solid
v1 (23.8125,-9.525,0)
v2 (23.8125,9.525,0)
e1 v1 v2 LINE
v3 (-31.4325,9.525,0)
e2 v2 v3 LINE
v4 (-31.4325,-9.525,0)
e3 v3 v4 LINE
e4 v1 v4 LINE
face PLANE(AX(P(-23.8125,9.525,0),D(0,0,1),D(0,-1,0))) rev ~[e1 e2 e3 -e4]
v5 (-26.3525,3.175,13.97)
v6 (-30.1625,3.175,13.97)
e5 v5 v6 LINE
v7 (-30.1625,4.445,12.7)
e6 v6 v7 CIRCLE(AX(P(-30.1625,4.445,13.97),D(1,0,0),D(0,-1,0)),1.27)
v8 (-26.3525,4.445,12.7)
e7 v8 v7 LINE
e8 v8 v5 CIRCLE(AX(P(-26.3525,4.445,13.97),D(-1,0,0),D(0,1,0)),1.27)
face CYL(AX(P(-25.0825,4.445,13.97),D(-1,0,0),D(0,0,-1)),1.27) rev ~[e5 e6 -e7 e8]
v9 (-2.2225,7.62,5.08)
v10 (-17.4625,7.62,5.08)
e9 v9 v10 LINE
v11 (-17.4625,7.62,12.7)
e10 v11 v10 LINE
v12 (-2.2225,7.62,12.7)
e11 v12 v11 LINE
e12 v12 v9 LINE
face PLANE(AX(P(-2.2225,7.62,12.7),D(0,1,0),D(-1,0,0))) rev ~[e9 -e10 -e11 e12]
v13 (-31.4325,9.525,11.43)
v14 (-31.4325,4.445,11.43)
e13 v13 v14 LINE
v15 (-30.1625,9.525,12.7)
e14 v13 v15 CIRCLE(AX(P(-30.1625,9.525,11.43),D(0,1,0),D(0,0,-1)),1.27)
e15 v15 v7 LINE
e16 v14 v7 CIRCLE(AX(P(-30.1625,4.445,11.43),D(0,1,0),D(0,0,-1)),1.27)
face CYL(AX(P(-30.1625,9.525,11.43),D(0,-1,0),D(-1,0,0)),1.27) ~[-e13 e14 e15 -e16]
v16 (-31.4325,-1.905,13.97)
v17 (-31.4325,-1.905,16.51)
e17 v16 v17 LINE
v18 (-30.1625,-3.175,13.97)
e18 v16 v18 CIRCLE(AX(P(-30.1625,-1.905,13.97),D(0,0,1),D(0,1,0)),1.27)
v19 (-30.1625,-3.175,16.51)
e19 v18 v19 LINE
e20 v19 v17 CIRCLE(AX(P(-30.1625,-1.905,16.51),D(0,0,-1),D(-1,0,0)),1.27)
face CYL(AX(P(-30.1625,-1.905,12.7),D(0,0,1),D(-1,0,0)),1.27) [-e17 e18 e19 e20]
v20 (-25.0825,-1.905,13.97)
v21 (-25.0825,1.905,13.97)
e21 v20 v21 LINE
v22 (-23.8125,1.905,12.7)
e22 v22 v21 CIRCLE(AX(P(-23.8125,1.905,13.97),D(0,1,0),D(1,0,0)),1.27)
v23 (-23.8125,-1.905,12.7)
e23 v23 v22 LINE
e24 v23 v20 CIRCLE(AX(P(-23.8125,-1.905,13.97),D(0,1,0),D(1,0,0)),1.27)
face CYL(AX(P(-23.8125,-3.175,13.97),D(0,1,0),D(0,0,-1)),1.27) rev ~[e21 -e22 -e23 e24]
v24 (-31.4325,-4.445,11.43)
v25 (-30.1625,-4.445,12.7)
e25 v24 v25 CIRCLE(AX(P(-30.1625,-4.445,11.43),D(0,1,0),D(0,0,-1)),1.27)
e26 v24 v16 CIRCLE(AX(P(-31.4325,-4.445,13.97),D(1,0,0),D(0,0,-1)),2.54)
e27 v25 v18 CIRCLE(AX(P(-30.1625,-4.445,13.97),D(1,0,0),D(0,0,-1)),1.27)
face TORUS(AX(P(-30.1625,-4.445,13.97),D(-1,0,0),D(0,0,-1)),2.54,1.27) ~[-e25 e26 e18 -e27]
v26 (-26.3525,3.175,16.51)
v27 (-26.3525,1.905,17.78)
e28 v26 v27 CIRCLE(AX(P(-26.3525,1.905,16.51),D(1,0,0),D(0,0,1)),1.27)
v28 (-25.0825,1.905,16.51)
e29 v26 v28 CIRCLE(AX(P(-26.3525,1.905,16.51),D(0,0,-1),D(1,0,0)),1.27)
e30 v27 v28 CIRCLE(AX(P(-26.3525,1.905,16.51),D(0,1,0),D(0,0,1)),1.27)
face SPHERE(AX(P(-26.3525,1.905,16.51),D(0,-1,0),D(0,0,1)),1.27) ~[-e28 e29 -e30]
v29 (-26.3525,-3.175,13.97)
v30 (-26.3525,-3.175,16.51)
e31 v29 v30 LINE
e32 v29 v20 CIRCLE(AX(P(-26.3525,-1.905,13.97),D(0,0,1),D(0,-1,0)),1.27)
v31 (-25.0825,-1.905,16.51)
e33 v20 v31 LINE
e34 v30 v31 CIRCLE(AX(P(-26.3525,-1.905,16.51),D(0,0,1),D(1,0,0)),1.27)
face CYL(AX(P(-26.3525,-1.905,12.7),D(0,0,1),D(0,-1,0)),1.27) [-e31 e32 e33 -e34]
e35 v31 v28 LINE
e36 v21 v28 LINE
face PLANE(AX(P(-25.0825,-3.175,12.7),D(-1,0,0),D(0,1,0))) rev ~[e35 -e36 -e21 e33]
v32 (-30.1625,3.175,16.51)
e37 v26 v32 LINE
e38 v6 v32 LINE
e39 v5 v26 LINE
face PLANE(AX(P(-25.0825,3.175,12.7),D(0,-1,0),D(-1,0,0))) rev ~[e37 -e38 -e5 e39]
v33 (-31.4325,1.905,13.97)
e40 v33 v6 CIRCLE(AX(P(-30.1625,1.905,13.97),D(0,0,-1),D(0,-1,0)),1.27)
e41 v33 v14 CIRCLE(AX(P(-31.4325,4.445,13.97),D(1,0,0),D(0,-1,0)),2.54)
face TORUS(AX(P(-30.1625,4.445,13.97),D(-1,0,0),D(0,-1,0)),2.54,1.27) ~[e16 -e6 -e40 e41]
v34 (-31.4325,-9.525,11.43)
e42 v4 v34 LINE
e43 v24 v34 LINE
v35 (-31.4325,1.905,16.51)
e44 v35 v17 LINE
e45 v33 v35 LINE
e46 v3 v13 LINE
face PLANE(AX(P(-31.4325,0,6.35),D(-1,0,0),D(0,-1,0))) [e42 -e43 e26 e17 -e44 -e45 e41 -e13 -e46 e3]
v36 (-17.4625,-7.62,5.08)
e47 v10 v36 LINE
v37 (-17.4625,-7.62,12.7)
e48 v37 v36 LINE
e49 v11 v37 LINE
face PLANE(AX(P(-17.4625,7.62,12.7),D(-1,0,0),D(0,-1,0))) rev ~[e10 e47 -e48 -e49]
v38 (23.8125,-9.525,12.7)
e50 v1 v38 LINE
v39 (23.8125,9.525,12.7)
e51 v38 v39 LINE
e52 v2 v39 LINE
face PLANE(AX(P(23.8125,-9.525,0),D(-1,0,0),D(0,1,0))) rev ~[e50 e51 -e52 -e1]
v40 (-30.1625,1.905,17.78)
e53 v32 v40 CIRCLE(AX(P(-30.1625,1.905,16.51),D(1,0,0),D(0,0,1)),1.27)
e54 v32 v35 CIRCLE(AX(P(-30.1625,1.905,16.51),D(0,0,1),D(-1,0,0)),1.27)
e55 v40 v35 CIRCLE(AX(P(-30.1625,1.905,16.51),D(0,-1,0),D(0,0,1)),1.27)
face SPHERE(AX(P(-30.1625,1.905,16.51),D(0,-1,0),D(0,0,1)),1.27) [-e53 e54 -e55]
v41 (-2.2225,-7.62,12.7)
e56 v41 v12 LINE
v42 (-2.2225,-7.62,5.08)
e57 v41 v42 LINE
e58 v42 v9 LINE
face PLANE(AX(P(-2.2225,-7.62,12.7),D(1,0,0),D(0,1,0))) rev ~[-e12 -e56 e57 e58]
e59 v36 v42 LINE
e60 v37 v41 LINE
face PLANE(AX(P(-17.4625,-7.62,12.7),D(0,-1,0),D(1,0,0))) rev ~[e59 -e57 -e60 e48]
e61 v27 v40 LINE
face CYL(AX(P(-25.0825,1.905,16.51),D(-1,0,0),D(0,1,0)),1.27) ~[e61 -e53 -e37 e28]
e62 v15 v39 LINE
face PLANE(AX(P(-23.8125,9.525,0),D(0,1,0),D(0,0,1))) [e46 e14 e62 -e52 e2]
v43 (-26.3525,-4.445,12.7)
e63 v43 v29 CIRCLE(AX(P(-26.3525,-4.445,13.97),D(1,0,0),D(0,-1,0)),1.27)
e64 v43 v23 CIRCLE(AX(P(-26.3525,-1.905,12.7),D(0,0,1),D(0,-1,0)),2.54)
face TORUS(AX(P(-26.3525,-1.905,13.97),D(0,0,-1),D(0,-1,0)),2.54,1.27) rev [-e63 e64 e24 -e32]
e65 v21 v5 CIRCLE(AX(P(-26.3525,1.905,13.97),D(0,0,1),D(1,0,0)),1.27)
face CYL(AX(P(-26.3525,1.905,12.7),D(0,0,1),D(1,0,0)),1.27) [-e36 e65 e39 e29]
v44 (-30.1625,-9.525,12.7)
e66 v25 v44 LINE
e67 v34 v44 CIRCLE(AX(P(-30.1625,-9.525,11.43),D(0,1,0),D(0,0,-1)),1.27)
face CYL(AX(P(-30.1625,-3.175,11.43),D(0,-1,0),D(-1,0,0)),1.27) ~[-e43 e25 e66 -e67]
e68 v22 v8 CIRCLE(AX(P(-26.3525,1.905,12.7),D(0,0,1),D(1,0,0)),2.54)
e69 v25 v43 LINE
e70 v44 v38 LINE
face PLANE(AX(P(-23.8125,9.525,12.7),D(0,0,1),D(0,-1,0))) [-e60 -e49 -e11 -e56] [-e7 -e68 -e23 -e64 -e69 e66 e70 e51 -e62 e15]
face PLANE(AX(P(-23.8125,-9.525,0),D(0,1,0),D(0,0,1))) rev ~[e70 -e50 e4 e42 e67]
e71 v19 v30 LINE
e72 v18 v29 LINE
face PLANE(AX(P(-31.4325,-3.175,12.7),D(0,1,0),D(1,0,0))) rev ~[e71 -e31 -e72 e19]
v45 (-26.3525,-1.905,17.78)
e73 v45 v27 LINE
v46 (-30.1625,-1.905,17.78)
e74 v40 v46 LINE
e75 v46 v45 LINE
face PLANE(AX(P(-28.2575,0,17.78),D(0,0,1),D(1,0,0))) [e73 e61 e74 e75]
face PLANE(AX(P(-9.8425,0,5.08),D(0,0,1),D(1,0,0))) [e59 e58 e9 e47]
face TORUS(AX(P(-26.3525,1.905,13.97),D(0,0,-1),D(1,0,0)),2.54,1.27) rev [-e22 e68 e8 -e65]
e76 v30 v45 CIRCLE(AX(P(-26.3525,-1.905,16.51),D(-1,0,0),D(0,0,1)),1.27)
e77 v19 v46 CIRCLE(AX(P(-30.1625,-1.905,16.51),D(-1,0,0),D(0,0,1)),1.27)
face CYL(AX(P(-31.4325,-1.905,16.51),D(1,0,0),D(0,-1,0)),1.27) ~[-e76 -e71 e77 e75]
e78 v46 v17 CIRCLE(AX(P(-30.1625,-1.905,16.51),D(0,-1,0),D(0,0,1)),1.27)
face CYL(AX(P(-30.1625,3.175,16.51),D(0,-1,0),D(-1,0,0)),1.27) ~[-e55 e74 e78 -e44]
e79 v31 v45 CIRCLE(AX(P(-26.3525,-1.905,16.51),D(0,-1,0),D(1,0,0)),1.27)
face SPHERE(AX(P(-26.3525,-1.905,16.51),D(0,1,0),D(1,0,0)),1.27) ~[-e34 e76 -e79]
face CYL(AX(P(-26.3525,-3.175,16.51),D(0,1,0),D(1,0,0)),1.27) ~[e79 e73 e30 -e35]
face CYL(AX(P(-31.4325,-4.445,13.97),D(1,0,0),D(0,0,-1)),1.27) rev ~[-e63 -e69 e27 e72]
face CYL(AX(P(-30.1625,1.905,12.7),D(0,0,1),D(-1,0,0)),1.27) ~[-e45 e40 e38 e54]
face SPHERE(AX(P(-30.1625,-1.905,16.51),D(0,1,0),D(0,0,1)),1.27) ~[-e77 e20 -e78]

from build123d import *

# Parameters (mm, degrees)
F0_W     = 47.625
F0_H     = 19.05
F1_DEPTH = 12.7
F3_DEPTH = 7.62
F4_W     = 19.05
F4_H     = 12.7
F5_DEPTH = 7.62
F7_DEPTH = 5.08
F8_R     = 1.27


with BuildPart() as f1:
    # F0 (on Top) → F1 (new body)
    with BuildSketch(Plane.XY):
        Rectangle(F0_W, F0_H)
    extrude(amount=F1_DEPTH)

    # F2 (on face) → F3 (cut)
    with BuildSketch(Plane.XY.offset(12.7)):
        Polygon((-17.4625, -7.62), (-2.2225, -7.62), (-2.2225, 0), (-2.2225, 7.62), (-17.4625, 7.62), align=None)
    extrude(amount=-F3_DEPTH, mode=Mode.SUBTRACT)

    # F4 (on face) → F5 (join)
    with BuildSketch(Plane(origin=(-23.8125, 0, 0), x_dir=(0, -1, 0), z_dir=(-1, 0, 0))):
        with Locations((0, 6.35)):
            Rectangle(F4_W, F4_H)
    extrude(amount=F5_DEPTH)

    # F6 (on face) → F7 (join)
    with BuildSketch(Plane.XY.offset(12.7)):
        Polygon((-28.2575, 3.175), (-31.4325, 3.175), (-31.4325, -3.175), (-25.0825, -3.175), (-25.0825, 3.175), align=None)
    extrude(amount=F7_DEPTH)

    # F8
    f8_edges = [f1.edges().sort_by_distance(p)[0] for p in [
        (-31.4325, 0, 17.78),
        (-25.0825, 0, 17.78),
        (-25.0825, -3.175, 15.24),
        (-28.2575, -3.175, 17.78),
        (-28.2575, 3.175, 17.78),
        (-31.4325, -3.175, 15.24),
        (-28.2575, -3.175, 12.7),
        (-25.0825, 0, 12.7),
        (-28.2575, 3.175, 12.7),
        (-31.4325, 3.175, 15.24),
        (-25.0825, 3.175, 15.24),
        (-31.4325, -6.35, 12.7),
        (-31.4325, 6.35, 12.7),
    ]]
    fillet(f8_edges, radius=F8_R)


solid = f1.part
